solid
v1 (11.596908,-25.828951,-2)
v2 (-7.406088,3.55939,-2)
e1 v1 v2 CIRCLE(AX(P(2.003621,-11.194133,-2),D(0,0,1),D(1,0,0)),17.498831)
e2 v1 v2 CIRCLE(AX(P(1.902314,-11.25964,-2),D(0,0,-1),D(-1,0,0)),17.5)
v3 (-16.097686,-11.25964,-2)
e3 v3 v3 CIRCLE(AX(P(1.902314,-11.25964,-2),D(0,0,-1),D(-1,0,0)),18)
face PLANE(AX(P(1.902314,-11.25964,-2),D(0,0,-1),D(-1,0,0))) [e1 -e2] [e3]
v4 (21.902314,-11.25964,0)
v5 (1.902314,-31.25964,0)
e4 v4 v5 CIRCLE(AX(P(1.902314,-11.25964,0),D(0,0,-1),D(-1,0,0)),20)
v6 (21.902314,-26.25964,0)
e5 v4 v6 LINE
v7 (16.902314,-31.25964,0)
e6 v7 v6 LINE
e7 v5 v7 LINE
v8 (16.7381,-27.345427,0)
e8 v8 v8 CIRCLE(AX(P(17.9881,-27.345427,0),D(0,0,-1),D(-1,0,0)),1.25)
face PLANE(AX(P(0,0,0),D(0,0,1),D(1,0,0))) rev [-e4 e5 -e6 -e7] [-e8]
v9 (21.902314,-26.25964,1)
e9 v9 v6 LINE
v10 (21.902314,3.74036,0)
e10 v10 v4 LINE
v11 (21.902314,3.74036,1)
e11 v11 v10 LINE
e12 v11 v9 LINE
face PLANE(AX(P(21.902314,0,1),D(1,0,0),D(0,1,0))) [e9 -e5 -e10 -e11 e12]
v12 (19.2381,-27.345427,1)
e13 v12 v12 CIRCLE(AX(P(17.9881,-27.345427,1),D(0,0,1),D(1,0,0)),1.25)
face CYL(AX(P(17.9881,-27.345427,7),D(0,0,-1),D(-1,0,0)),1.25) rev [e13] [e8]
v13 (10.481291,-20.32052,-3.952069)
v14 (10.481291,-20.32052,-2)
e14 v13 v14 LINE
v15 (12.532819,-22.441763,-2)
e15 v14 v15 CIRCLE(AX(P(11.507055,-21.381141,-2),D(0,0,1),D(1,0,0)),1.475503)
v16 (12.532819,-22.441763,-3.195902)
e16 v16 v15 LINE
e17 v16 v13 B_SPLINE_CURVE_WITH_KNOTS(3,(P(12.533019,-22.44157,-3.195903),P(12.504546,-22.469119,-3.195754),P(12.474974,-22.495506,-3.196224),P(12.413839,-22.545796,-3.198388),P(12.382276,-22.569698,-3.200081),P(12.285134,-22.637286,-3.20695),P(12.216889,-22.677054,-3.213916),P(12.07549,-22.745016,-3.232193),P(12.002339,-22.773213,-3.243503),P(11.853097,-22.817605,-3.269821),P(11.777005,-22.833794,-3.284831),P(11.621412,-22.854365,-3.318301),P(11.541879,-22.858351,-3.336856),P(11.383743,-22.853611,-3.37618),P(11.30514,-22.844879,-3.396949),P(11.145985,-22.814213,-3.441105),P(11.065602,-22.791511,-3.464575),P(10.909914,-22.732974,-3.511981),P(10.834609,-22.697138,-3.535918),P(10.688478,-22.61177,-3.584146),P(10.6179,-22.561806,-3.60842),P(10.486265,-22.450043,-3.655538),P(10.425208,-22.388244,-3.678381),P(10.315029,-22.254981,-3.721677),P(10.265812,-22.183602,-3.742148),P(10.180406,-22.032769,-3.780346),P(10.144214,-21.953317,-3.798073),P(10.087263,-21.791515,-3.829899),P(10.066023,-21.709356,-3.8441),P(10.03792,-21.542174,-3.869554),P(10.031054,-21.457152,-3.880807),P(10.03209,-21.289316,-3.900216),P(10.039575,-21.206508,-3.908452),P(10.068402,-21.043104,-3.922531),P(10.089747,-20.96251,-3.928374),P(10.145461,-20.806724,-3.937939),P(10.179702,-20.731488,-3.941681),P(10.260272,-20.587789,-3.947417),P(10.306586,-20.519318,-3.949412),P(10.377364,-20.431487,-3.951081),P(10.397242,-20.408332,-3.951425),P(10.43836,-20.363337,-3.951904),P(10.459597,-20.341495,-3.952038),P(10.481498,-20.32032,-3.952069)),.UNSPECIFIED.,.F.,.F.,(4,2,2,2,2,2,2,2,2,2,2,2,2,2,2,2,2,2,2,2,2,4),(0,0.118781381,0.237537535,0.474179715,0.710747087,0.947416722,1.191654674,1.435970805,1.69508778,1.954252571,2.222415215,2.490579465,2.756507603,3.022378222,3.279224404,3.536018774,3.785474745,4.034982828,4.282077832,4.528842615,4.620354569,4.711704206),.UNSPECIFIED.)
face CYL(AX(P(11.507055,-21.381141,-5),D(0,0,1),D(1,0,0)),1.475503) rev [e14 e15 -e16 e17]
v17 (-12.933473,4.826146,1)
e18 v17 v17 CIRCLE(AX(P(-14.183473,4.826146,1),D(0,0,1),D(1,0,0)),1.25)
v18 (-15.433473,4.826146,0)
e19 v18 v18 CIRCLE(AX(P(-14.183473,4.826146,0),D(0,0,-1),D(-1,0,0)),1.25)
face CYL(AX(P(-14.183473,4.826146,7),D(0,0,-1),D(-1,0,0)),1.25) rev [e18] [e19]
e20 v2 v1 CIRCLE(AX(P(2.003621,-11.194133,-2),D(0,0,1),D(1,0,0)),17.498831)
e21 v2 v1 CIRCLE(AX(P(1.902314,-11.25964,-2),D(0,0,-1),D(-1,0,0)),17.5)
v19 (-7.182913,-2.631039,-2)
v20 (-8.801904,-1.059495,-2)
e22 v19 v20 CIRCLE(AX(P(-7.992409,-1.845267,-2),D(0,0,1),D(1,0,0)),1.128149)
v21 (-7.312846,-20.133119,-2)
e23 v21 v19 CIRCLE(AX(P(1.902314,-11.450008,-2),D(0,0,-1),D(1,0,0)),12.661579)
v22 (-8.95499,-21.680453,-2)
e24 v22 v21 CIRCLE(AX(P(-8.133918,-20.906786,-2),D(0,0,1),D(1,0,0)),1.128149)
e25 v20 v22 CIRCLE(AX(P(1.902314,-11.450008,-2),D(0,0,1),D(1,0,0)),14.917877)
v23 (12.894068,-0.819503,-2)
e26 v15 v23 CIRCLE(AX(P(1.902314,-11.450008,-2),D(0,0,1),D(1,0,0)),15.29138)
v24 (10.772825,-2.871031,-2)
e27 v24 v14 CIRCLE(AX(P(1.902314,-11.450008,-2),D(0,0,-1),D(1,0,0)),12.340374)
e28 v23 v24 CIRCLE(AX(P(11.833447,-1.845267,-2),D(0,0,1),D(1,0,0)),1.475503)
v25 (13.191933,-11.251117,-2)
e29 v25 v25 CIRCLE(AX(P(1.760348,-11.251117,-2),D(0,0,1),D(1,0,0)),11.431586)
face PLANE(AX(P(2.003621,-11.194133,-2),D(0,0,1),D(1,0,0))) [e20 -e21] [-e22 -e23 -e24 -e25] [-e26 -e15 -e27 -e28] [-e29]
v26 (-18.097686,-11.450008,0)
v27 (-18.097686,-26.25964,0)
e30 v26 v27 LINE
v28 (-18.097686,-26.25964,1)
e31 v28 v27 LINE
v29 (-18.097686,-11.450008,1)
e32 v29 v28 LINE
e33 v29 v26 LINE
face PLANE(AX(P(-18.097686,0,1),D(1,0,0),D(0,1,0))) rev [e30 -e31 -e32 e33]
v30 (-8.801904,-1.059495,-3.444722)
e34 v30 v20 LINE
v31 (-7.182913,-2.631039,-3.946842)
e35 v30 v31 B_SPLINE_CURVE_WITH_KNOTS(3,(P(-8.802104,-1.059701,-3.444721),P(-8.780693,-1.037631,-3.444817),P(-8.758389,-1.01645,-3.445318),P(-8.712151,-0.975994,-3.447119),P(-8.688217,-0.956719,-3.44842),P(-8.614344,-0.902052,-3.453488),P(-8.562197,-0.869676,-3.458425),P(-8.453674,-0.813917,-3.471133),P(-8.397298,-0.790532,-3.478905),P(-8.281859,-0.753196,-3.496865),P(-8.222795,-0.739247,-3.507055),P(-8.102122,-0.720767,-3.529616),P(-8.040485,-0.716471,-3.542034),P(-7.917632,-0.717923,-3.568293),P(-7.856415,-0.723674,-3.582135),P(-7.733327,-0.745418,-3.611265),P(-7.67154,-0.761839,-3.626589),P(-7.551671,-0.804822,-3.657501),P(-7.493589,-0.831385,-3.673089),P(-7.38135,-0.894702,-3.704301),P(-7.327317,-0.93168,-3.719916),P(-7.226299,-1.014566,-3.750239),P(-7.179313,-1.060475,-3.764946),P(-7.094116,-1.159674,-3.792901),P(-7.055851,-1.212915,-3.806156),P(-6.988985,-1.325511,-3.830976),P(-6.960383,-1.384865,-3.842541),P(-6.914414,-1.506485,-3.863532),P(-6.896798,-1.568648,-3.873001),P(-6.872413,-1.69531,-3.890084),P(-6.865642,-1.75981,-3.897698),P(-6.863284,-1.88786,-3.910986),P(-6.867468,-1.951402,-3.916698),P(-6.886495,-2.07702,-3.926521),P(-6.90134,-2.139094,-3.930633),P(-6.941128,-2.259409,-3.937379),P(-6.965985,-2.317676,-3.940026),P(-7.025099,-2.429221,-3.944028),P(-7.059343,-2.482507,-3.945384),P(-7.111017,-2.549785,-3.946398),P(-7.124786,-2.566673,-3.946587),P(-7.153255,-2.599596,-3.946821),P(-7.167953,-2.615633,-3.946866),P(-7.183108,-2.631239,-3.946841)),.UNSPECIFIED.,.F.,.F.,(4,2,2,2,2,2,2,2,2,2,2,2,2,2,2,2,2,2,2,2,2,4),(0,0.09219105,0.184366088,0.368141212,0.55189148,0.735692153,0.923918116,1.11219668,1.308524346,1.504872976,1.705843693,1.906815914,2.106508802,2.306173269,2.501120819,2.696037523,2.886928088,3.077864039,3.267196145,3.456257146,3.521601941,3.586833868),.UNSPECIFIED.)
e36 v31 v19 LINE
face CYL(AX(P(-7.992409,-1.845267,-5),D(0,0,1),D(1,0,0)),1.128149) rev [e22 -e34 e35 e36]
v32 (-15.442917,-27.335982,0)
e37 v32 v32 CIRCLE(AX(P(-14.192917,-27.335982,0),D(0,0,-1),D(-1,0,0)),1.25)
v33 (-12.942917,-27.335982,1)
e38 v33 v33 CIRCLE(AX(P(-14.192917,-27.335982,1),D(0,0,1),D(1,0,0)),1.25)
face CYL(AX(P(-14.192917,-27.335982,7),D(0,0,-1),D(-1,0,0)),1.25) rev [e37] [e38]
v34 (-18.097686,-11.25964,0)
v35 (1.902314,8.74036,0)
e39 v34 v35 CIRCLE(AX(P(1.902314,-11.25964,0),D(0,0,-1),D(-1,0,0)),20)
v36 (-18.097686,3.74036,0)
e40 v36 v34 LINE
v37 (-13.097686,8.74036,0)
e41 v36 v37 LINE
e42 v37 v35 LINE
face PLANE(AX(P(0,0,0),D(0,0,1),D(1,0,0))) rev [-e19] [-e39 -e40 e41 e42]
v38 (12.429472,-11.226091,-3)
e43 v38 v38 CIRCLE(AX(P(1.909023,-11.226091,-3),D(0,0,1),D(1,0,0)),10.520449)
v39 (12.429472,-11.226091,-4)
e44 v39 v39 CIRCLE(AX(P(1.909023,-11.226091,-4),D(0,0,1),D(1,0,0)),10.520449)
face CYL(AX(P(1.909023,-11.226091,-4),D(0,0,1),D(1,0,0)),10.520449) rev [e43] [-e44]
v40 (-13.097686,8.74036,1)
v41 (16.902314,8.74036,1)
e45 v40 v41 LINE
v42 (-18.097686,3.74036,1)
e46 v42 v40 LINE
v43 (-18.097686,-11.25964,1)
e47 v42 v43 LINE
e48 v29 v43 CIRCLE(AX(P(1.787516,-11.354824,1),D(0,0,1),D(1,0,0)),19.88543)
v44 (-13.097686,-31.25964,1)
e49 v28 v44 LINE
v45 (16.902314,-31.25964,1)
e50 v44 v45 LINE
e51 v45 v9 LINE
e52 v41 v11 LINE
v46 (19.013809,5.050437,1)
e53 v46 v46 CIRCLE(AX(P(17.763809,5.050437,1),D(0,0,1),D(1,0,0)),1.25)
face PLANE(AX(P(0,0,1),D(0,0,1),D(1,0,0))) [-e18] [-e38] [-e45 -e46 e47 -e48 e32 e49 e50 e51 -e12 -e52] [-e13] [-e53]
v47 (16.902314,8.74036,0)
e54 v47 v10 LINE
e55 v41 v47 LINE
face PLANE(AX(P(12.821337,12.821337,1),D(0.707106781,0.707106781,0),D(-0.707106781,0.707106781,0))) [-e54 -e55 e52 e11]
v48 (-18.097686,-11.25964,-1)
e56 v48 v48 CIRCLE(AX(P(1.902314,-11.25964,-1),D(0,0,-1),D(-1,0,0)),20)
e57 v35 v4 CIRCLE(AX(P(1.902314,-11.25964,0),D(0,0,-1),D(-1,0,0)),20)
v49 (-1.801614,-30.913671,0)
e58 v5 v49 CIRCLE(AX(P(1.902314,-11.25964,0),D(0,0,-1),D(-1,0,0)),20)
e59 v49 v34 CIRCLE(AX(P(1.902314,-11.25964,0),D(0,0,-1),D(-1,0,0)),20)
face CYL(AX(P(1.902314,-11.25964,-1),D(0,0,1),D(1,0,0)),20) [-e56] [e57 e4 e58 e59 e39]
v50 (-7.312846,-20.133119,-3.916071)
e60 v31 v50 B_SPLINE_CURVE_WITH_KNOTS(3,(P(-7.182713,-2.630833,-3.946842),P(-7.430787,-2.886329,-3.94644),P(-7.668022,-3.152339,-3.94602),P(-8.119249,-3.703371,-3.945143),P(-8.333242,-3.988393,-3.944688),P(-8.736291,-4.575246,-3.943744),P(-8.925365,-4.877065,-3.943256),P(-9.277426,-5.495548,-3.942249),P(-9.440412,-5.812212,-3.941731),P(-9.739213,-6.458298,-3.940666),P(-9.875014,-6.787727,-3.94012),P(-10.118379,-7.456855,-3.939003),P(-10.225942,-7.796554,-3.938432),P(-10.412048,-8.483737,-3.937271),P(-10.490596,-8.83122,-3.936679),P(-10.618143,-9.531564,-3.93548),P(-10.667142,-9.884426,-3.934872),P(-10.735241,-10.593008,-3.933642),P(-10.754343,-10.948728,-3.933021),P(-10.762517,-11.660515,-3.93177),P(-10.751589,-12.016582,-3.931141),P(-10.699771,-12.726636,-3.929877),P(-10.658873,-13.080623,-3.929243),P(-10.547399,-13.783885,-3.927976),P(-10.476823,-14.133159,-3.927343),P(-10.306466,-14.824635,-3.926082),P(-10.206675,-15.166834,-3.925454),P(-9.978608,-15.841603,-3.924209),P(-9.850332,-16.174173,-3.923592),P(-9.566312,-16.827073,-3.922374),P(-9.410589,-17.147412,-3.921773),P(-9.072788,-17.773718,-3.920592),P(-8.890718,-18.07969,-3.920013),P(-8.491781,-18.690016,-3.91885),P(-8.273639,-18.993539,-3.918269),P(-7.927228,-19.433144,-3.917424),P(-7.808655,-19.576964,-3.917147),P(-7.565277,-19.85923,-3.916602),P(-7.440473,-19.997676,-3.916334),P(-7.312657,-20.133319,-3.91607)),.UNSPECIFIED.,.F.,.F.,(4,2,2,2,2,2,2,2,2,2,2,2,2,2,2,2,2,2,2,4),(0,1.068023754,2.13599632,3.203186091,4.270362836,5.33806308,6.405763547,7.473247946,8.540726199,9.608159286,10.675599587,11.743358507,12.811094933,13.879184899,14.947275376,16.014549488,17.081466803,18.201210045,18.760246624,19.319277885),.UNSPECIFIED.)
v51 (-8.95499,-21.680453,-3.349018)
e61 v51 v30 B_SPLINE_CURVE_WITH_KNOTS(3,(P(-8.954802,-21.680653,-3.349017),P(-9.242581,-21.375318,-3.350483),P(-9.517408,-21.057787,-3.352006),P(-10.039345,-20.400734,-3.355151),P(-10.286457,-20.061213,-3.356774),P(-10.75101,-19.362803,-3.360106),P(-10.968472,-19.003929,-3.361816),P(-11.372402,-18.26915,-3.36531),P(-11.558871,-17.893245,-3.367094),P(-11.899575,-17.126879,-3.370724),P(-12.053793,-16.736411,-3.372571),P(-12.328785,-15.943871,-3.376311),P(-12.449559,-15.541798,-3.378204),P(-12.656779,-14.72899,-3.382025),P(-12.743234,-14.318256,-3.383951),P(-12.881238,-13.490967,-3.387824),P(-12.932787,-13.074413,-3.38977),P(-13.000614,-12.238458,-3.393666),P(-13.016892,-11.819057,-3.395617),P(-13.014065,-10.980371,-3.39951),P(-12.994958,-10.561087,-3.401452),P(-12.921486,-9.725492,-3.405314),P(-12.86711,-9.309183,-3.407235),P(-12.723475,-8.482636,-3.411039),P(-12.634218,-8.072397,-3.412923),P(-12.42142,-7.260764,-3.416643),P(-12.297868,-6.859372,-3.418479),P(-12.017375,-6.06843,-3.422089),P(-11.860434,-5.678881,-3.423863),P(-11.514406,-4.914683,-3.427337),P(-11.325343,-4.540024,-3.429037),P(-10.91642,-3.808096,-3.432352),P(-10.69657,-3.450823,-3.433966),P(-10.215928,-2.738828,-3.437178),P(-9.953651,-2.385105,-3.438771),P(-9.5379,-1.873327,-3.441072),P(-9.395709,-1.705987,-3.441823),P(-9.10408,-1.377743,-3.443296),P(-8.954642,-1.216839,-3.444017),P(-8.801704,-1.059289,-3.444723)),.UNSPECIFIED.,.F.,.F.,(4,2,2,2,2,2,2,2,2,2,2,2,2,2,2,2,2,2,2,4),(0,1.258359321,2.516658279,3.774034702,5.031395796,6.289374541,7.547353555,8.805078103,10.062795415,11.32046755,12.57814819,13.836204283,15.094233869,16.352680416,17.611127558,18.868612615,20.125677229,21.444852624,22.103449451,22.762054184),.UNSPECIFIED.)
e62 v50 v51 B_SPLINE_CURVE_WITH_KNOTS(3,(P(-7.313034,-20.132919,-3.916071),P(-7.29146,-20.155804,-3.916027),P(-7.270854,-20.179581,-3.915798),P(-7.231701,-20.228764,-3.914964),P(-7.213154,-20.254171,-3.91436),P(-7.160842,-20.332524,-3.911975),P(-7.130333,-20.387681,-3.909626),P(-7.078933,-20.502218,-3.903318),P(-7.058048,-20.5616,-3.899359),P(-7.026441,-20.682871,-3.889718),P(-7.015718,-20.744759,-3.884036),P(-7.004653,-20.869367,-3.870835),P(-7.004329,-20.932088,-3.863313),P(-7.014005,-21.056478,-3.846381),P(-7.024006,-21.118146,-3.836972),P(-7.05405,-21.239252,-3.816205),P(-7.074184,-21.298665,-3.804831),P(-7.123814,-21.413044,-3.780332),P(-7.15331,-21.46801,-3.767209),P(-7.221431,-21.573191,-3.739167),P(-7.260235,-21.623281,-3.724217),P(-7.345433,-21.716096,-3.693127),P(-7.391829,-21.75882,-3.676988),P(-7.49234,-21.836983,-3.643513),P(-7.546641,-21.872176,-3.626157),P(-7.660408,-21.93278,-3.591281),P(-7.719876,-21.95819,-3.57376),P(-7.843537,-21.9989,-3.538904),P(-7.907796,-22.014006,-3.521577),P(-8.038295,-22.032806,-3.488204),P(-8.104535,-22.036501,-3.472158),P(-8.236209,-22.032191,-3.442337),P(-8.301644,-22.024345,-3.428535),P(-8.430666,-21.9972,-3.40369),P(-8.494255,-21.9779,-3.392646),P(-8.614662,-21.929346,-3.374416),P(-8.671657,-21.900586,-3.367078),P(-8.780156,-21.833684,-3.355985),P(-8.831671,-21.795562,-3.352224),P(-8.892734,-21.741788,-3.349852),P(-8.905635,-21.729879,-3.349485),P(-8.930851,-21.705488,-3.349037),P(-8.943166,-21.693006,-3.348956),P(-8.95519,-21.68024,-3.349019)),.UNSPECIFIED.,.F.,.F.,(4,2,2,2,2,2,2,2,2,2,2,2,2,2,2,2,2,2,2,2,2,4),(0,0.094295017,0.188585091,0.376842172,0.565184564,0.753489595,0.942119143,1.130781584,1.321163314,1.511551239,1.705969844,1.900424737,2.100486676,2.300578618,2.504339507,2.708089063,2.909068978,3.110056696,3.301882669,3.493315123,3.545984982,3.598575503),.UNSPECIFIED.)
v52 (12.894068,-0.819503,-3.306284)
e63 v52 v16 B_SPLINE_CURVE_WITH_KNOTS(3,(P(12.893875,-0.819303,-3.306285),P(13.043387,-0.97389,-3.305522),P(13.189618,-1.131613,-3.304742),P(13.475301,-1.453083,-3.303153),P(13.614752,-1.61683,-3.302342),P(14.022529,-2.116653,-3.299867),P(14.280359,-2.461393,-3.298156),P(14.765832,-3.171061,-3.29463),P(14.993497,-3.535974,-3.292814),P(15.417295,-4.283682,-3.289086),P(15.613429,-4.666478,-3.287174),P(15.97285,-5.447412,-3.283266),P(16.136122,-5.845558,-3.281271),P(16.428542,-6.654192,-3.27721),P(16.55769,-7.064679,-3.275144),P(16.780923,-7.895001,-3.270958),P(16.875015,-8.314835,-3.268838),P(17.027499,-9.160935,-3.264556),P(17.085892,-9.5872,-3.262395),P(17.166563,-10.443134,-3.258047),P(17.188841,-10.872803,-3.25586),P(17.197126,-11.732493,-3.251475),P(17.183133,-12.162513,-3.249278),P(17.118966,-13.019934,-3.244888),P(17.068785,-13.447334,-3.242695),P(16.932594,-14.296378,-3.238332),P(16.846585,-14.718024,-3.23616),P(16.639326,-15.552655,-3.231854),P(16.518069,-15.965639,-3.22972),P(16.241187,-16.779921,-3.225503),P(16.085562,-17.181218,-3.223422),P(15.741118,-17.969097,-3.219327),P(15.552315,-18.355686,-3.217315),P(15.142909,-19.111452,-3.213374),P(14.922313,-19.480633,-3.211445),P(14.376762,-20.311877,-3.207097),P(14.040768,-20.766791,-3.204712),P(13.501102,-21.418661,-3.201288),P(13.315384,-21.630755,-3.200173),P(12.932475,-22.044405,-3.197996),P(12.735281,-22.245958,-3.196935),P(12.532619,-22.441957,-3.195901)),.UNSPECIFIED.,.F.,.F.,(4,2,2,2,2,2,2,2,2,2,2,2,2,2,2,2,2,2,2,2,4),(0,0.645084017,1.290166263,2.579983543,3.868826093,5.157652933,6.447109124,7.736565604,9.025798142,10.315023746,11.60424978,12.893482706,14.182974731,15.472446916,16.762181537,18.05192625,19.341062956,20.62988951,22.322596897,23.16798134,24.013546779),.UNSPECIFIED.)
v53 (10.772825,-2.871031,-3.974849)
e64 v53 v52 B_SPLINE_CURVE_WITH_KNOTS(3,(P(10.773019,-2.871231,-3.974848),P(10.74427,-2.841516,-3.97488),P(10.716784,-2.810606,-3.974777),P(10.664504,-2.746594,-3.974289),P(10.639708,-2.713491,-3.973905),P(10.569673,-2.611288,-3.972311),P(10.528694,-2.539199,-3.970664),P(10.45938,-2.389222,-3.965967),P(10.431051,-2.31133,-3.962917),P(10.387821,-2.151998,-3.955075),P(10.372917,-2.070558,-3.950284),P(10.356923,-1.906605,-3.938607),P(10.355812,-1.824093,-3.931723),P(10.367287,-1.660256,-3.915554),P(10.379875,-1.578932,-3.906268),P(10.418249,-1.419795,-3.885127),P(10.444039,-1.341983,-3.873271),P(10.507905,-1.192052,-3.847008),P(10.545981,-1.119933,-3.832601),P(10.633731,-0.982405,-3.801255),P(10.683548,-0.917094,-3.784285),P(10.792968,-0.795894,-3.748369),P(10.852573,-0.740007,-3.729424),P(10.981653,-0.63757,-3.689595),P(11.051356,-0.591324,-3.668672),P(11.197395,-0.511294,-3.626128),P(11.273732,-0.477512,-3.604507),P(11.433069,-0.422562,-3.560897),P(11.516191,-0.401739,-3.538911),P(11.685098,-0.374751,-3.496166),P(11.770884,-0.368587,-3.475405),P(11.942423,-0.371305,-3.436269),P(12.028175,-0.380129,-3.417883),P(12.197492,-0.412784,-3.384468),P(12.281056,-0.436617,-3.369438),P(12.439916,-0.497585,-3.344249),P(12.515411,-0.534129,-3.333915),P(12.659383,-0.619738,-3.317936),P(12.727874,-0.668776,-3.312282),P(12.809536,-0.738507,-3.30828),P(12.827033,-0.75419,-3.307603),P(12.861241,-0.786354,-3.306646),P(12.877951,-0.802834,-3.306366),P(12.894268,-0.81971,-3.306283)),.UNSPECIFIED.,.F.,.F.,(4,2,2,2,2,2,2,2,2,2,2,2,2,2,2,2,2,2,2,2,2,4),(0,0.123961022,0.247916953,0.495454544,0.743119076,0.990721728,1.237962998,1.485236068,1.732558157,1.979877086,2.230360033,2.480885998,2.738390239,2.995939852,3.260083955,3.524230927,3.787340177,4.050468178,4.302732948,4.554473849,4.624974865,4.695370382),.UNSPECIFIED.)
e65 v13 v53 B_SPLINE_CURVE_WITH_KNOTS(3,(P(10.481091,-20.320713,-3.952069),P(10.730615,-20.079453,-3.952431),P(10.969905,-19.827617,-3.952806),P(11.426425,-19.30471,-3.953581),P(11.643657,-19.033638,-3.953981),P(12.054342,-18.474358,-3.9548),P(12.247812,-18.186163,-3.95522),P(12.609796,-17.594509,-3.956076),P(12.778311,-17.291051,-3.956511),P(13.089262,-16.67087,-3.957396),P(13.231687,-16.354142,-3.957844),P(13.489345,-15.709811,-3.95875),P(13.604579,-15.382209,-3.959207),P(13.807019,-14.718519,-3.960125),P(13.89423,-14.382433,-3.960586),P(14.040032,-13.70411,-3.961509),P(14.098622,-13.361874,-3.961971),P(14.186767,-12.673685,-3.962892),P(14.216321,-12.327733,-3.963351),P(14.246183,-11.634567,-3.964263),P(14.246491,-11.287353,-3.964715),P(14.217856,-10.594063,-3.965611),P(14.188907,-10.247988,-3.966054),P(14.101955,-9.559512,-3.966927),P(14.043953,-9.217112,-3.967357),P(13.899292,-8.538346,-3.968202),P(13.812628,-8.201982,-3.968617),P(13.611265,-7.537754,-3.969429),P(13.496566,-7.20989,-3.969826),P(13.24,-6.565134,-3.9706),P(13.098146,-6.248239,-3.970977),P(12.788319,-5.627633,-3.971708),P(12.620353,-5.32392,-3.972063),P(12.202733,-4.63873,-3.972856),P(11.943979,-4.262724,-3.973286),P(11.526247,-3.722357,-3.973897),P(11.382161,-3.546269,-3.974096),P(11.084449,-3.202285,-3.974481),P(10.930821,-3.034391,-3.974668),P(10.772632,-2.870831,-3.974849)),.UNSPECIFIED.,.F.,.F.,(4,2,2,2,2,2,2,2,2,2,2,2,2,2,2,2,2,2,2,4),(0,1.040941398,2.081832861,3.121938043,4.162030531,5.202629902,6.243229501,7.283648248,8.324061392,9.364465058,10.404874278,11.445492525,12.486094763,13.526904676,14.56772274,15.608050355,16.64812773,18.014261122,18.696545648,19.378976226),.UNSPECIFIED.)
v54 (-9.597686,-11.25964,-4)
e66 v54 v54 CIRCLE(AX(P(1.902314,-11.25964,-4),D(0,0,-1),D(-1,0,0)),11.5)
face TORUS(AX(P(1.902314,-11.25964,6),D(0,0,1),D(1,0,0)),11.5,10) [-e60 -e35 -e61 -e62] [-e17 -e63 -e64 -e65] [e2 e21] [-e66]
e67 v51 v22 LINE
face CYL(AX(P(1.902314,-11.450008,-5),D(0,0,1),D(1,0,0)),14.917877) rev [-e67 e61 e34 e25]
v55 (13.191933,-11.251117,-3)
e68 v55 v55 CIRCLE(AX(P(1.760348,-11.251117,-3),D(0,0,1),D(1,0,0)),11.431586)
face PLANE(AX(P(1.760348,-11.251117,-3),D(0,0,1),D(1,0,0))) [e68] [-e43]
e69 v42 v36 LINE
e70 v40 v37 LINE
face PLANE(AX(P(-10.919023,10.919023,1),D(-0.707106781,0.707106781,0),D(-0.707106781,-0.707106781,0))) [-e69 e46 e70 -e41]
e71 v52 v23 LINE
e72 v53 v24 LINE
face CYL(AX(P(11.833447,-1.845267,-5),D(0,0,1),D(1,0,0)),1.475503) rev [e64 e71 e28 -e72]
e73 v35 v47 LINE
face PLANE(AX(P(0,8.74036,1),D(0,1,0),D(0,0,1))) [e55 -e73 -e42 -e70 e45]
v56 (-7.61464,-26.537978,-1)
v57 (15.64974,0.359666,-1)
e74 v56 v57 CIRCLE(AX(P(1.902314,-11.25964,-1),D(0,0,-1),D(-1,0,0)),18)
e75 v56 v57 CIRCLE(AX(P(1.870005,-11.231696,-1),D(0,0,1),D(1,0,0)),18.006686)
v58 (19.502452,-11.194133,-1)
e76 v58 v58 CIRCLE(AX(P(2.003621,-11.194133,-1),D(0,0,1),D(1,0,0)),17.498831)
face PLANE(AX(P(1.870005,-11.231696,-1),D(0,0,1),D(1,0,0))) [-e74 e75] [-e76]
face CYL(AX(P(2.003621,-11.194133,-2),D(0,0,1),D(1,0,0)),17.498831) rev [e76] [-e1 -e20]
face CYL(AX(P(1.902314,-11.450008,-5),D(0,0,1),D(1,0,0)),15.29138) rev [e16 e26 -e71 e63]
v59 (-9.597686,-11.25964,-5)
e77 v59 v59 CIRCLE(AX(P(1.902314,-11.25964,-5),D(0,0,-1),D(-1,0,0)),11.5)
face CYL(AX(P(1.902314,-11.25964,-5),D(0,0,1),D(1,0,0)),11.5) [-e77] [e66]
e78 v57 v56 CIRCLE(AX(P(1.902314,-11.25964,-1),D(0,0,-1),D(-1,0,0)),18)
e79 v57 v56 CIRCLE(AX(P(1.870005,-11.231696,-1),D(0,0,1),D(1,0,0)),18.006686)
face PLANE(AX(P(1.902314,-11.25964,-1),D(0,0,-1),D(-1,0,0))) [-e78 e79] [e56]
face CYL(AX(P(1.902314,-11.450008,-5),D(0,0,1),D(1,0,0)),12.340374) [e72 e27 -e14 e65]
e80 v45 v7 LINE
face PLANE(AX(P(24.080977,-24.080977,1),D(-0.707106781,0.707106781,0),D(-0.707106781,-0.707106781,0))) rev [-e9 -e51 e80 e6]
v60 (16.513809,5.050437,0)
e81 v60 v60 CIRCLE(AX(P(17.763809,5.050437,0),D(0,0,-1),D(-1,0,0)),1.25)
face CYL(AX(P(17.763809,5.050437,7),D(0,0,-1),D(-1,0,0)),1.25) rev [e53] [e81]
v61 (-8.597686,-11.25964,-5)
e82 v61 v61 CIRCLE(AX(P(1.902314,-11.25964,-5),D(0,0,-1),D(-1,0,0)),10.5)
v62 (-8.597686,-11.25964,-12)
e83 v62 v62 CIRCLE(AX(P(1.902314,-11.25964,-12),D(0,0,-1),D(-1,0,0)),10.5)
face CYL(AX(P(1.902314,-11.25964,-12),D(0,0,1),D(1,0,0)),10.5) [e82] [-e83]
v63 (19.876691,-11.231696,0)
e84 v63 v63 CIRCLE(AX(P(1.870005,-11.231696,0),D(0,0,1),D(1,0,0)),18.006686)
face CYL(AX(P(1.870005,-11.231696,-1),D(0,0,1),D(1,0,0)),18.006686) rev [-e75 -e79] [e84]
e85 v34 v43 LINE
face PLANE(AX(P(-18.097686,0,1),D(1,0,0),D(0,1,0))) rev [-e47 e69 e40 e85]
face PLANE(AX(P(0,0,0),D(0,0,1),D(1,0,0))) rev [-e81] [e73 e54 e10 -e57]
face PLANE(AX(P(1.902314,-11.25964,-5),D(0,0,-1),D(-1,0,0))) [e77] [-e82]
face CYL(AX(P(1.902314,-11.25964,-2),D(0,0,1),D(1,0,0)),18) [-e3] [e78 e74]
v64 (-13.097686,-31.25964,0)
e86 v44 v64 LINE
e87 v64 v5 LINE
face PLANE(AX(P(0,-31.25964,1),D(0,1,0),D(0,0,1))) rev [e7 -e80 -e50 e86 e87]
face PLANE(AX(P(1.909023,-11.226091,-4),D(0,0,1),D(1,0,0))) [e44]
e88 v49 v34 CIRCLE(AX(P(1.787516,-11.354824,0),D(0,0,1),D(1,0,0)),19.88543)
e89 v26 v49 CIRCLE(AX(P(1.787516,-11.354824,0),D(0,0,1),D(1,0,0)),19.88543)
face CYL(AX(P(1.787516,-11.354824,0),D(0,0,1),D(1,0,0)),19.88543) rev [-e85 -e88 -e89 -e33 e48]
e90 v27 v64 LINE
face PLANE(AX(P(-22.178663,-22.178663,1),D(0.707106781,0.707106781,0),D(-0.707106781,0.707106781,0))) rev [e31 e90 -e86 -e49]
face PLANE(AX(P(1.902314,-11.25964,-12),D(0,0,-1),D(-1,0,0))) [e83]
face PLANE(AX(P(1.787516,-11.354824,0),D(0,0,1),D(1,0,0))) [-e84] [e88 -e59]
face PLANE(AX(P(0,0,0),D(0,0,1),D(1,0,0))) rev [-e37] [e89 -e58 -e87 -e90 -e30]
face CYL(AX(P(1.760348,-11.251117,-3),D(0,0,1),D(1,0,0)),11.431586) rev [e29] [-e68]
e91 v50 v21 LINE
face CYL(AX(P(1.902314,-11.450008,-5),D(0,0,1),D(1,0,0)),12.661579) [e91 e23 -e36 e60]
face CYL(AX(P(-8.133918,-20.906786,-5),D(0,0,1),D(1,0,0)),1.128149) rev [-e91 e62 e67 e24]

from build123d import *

# Parameters (mm, degrees)
SKETCH9_R            = 20
BOSS_EXTRUDE8_DEPTH  = 1
SKETCH10_R           = 20
BOSS_EXTRUDE9_DEPTH  = 1
SKETCH11_R           = 18
BOSS_EXTRUDE10_DEPTH = 1
SKETCH13_R           = 17.5
BOSS_EXTRUDE11_DEPTH = 2
FILLET2_R            = 10
SKETCH15_R           = 11.5
BOSS_EXTRUDE14_DEPTH = 1
SKETCH16_R           = 10.5
BOSS_EXTRUDE15_DEPTH = 7
SKETCH17_R           = 1.25
CUT_EXTRUDE1_DEPTH   = 7
SKETCH22_R           = 19.885430157
CUT_EXTRUDE4_DEPTH   = 1
SKETCH23_R           = 18.006686429
CUT_EXTRUDE5_DEPTH   = 1
SKETCH24_R           = 17.498830581
CUT_EXTRUDE6_DEPTH   = 1
SKETCH25_R           = 11.431585712
CUT_EXTRUDE7_DEPTH   = 1
CUT_EXTRUDE8_DEPTH   = 3
SKETCH32_R           = 10.520449086
CUT_EXTRUDE10_DEPTH  = 1


with BuildPart() as part:
    # Sketch9 → Boss-Extrude8 (new body)
    with BuildSketch(Plane.XY):
        with BuildLine():
            Line((16.902313625, 8.740359897), (1.902313625, 8.740359897))
            ThreePointArc((1.902313625, 8.740359897), (16.044449248, 2.882495521), (21.902313625, -11.259640103))
            Line((21.902313625, -11.259640103), (21.902313625, 3.740359897))
            Line((21.902313625, 3.740359897), (16.902313625, 8.740359897))
        make_face()
        with BuildLine():
            ThreePointArc((21.902313625, -11.259640103), (16.044449248, -25.401775727), (1.902313625, -31.259640103))
            Line((1.902313625, -31.259640103), (16.902313625, -31.259640103))
            Line((16.902313625, -31.259640103), (21.902313625, -26.259640103))
            Line((21.902313625, -26.259640103), (21.902313625, -11.259640103))
        make_face()
        with Locations((1.902313625, -11.259640103)):
            Circle(SKETCH9_R)
        with BuildLine():
            ThreePointArc((1.902313625, -31.259640103), (-12.239821999, -25.401775727), (-18.097686375, -11.259640103))
            Line((-18.097686375, -11.259640103), (-18.097686375, -26.259640103))
            Line((-18.097686375, -26.259640103), (-13.097686375, -31.259640103))
            Line((-13.097686375, -31.259640103), (1.902313625, -31.259640103))
        make_face()
        with BuildLine():
            Line((-13.097686375, 8.740359897), (-18.097686375, 3.740359897))
            Line((-18.097686375, 3.740359897), (-18.097686375, -11.259640103))
            ThreePointArc((-18.097686375, -11.259640103), (-12.239821999, 2.882495521), (1.902313625, 8.740359897))
            Line((1.902313625, 8.740359897), (-13.097686375, 8.740359897))
        make_face()
    extrude(amount=BOSS_EXTRUDE8_DEPTH)

    # Sketch10 → Boss-Extrude9 (add)
    with BuildSketch(Plane(origin=(0, 0, 0), x_dir=(-1, 0, 0), z_dir=(0, 0, -1))):
        with Locations((-1.902313625, -11.259640103)):
            Circle(SKETCH10_R)
    extrude(amount=BOSS_EXTRUDE9_DEPTH)

    # Sketch11 → Boss-Extrude10 (add)
    with BuildSketch(Plane(origin=(0, 0, -1), x_dir=(-1, 0, 0), z_dir=(0, 0, -1))):
        with Locations((-1.902313625, -11.259640103)):
            Circle(SKETCH11_R)
    extrude(amount=BOSS_EXTRUDE10_DEPTH)

    # Sketch13 → Boss-Extrude11 (add)
    with BuildSketch(Plane(origin=(0, 0, -2), x_dir=(-1, 0, 0), z_dir=(0, 0, -1))):
        with Locations((-1.902313625, -11.259640103)):
            Circle(SKETCH13_R)
    extrude(amount=BOSS_EXTRUDE11_DEPTH)

    # Fillet2
    # the kernel refuses this fillet: 10 mm, written as the material it takes off along each edge
    with BuildSketch(Plane(origin=(1.902313625, -11.259640103, -4), x_dir=(-1, 0, 0), z_dir=(0, -1, 0))) as fillet2_piece_1:
        with BuildLine():
            CenterArc((11.5, -10), FILLET2_R, 53.130102354, 36.869897646)
            Line((11.5, 0), (11.5, 0.2))
            Line((11.5, 0.2), (17.5, 0.2))
            Line((17.5, 0.2), (17.7, 0))
            ThreePointArc((17.7, 0), (17.7, -1), (17.62, -1.84))
            Line((17.62, -1.84), (17.5, -2))
        make_face()
    revolve(axis=Axis((1.902313625, -11.259640103, -4), (0, 0, -1)), mode=Mode.SUBTRACT)

    # Sketch15 → Boss-Extrude14 (add)
    with BuildSketch(Plane(origin=(0, 0, -4), x_dir=(-1, 0, 0), z_dir=(0, 0, -1))):
        with Locations((-1.902313625, -11.259640103)):
            Circle(SKETCH15_R)
    extrude(amount=BOSS_EXTRUDE14_DEPTH)

    # Sketch16 → Boss-Extrude15 (add)
    with BuildSketch(Plane(origin=(0, 0, -5), x_dir=(-1, 0, 0), z_dir=(0, 0, -1))):
        with Locations((-1.902313625, -11.259640103)):
            Circle(SKETCH16_R)
    extrude(amount=BOSS_EXTRUDE15_DEPTH)

    # Sketch17 → Cut-Extrude1 (cut)
    with BuildSketch(Plane(origin=(0, 0, 0), x_dir=(-1, 0, 0), z_dir=(0, 0, -1))):
        with Locations((-17.988100062, -27.34542654)):
            Circle(SKETCH17_R)
        with Locations((-17.763809056, 5.050437341)):
            Circle(SKETCH17_R)
        with Locations((14.183472813, 4.826146335)):
            Circle(SKETCH17_R)
        with Locations((14.192917147, -27.335982207)):
            Circle(SKETCH17_R)
    extrude(amount=-CUT_EXTRUDE1_DEPTH, mode=Mode.SUBTRACT)

    # Sketch22 → Cut-Extrude4 (cut)
    with BuildSketch(Plane.XY.offset(1)):
        with Locations((1.787515975, -11.354824182)):
            Circle(SKETCH22_R)
    extrude(amount=-CUT_EXTRUDE4_DEPTH, mode=Mode.SUBTRACT)

    # Sketch23 → Cut-Extrude5 (cut)
    with BuildSketch(Plane.XY):
        with Locations((1.870004869, -11.231695531)):
            Circle(SKETCH23_R)
    extrude(amount=-CUT_EXTRUDE5_DEPTH, mode=Mode.SUBTRACT)

    # Sketch24 → Cut-Extrude6 (cut)
    with BuildSketch(Plane.XY.offset(-1)):
        with Locations((2.003621261, -11.194132882)):
            Circle(SKETCH24_R)
    extrude(amount=-CUT_EXTRUDE6_DEPTH, mode=Mode.SUBTRACT)

    # Sketch25 → Cut-Extrude7 (cut)
    with BuildSketch(Plane.XY.offset(-2)):
        with Locations((1.760347749, -11.251117152)):
            Circle(SKETCH25_R)
    extrude(amount=-CUT_EXTRUDE7_DEPTH, mode=Mode.SUBTRACT)

    # Sketch31 → Cut-Extrude8 (cut)
    with BuildSketch(Plane.XY.offset(-2)):
        with BuildLine():
            ThreePointArc((-8.801904408, -1.059495183), (-13.015152024, -11.339263863), (-8.954990434, -21.680452743))
            ThreePointArc((-8.954990434, -21.680452743), (-7.360251179, -21.727858352), (-7.312845569, -20.133119097))
            ThreePointArc((-7.312845569, -20.133119097), (-10.758916086, -11.356013725), (-7.182913489, -2.631038874))
            ThreePointArc((-7.182913489, -2.631038874), (-7.206637103, -1.035771569), (-8.801904408, -1.059495183))
        make_face()
        with BuildLine():
            ThreePointArc((12.532818581, -22.441763104), (17.191560153, -11.705450505), (12.894068467, -0.819503305))
            ThreePointArc((12.894068467, -0.819503305), (10.807683124, -0.784645409), (10.772825228, -2.871030753))
            ThreePointArc((10.772825228, -2.871030753), (14.240965704, -11.656153997), (10.481291133, -20.320519865))
            ThreePointArc((10.481291133, -20.320519865), (10.446433238, -22.406905208), (12.532818581, -22.441763104))
        make_face()
    extrude(amount=-CUT_EXTRUDE8_DEPTH, mode=Mode.SUBTRACT)

    # Sketch32 → Cut-Extrude10 (cut)
    with BuildSketch(Plane.XY.offset(-3)):
        with Locations((1.909022751, -11.226091394)):
            Circle(SKETCH32_R)
    extrude(amount=-CUT_EXTRUDE10_DEPTH, mode=Mode.SUBTRACT)


solid = part.part
